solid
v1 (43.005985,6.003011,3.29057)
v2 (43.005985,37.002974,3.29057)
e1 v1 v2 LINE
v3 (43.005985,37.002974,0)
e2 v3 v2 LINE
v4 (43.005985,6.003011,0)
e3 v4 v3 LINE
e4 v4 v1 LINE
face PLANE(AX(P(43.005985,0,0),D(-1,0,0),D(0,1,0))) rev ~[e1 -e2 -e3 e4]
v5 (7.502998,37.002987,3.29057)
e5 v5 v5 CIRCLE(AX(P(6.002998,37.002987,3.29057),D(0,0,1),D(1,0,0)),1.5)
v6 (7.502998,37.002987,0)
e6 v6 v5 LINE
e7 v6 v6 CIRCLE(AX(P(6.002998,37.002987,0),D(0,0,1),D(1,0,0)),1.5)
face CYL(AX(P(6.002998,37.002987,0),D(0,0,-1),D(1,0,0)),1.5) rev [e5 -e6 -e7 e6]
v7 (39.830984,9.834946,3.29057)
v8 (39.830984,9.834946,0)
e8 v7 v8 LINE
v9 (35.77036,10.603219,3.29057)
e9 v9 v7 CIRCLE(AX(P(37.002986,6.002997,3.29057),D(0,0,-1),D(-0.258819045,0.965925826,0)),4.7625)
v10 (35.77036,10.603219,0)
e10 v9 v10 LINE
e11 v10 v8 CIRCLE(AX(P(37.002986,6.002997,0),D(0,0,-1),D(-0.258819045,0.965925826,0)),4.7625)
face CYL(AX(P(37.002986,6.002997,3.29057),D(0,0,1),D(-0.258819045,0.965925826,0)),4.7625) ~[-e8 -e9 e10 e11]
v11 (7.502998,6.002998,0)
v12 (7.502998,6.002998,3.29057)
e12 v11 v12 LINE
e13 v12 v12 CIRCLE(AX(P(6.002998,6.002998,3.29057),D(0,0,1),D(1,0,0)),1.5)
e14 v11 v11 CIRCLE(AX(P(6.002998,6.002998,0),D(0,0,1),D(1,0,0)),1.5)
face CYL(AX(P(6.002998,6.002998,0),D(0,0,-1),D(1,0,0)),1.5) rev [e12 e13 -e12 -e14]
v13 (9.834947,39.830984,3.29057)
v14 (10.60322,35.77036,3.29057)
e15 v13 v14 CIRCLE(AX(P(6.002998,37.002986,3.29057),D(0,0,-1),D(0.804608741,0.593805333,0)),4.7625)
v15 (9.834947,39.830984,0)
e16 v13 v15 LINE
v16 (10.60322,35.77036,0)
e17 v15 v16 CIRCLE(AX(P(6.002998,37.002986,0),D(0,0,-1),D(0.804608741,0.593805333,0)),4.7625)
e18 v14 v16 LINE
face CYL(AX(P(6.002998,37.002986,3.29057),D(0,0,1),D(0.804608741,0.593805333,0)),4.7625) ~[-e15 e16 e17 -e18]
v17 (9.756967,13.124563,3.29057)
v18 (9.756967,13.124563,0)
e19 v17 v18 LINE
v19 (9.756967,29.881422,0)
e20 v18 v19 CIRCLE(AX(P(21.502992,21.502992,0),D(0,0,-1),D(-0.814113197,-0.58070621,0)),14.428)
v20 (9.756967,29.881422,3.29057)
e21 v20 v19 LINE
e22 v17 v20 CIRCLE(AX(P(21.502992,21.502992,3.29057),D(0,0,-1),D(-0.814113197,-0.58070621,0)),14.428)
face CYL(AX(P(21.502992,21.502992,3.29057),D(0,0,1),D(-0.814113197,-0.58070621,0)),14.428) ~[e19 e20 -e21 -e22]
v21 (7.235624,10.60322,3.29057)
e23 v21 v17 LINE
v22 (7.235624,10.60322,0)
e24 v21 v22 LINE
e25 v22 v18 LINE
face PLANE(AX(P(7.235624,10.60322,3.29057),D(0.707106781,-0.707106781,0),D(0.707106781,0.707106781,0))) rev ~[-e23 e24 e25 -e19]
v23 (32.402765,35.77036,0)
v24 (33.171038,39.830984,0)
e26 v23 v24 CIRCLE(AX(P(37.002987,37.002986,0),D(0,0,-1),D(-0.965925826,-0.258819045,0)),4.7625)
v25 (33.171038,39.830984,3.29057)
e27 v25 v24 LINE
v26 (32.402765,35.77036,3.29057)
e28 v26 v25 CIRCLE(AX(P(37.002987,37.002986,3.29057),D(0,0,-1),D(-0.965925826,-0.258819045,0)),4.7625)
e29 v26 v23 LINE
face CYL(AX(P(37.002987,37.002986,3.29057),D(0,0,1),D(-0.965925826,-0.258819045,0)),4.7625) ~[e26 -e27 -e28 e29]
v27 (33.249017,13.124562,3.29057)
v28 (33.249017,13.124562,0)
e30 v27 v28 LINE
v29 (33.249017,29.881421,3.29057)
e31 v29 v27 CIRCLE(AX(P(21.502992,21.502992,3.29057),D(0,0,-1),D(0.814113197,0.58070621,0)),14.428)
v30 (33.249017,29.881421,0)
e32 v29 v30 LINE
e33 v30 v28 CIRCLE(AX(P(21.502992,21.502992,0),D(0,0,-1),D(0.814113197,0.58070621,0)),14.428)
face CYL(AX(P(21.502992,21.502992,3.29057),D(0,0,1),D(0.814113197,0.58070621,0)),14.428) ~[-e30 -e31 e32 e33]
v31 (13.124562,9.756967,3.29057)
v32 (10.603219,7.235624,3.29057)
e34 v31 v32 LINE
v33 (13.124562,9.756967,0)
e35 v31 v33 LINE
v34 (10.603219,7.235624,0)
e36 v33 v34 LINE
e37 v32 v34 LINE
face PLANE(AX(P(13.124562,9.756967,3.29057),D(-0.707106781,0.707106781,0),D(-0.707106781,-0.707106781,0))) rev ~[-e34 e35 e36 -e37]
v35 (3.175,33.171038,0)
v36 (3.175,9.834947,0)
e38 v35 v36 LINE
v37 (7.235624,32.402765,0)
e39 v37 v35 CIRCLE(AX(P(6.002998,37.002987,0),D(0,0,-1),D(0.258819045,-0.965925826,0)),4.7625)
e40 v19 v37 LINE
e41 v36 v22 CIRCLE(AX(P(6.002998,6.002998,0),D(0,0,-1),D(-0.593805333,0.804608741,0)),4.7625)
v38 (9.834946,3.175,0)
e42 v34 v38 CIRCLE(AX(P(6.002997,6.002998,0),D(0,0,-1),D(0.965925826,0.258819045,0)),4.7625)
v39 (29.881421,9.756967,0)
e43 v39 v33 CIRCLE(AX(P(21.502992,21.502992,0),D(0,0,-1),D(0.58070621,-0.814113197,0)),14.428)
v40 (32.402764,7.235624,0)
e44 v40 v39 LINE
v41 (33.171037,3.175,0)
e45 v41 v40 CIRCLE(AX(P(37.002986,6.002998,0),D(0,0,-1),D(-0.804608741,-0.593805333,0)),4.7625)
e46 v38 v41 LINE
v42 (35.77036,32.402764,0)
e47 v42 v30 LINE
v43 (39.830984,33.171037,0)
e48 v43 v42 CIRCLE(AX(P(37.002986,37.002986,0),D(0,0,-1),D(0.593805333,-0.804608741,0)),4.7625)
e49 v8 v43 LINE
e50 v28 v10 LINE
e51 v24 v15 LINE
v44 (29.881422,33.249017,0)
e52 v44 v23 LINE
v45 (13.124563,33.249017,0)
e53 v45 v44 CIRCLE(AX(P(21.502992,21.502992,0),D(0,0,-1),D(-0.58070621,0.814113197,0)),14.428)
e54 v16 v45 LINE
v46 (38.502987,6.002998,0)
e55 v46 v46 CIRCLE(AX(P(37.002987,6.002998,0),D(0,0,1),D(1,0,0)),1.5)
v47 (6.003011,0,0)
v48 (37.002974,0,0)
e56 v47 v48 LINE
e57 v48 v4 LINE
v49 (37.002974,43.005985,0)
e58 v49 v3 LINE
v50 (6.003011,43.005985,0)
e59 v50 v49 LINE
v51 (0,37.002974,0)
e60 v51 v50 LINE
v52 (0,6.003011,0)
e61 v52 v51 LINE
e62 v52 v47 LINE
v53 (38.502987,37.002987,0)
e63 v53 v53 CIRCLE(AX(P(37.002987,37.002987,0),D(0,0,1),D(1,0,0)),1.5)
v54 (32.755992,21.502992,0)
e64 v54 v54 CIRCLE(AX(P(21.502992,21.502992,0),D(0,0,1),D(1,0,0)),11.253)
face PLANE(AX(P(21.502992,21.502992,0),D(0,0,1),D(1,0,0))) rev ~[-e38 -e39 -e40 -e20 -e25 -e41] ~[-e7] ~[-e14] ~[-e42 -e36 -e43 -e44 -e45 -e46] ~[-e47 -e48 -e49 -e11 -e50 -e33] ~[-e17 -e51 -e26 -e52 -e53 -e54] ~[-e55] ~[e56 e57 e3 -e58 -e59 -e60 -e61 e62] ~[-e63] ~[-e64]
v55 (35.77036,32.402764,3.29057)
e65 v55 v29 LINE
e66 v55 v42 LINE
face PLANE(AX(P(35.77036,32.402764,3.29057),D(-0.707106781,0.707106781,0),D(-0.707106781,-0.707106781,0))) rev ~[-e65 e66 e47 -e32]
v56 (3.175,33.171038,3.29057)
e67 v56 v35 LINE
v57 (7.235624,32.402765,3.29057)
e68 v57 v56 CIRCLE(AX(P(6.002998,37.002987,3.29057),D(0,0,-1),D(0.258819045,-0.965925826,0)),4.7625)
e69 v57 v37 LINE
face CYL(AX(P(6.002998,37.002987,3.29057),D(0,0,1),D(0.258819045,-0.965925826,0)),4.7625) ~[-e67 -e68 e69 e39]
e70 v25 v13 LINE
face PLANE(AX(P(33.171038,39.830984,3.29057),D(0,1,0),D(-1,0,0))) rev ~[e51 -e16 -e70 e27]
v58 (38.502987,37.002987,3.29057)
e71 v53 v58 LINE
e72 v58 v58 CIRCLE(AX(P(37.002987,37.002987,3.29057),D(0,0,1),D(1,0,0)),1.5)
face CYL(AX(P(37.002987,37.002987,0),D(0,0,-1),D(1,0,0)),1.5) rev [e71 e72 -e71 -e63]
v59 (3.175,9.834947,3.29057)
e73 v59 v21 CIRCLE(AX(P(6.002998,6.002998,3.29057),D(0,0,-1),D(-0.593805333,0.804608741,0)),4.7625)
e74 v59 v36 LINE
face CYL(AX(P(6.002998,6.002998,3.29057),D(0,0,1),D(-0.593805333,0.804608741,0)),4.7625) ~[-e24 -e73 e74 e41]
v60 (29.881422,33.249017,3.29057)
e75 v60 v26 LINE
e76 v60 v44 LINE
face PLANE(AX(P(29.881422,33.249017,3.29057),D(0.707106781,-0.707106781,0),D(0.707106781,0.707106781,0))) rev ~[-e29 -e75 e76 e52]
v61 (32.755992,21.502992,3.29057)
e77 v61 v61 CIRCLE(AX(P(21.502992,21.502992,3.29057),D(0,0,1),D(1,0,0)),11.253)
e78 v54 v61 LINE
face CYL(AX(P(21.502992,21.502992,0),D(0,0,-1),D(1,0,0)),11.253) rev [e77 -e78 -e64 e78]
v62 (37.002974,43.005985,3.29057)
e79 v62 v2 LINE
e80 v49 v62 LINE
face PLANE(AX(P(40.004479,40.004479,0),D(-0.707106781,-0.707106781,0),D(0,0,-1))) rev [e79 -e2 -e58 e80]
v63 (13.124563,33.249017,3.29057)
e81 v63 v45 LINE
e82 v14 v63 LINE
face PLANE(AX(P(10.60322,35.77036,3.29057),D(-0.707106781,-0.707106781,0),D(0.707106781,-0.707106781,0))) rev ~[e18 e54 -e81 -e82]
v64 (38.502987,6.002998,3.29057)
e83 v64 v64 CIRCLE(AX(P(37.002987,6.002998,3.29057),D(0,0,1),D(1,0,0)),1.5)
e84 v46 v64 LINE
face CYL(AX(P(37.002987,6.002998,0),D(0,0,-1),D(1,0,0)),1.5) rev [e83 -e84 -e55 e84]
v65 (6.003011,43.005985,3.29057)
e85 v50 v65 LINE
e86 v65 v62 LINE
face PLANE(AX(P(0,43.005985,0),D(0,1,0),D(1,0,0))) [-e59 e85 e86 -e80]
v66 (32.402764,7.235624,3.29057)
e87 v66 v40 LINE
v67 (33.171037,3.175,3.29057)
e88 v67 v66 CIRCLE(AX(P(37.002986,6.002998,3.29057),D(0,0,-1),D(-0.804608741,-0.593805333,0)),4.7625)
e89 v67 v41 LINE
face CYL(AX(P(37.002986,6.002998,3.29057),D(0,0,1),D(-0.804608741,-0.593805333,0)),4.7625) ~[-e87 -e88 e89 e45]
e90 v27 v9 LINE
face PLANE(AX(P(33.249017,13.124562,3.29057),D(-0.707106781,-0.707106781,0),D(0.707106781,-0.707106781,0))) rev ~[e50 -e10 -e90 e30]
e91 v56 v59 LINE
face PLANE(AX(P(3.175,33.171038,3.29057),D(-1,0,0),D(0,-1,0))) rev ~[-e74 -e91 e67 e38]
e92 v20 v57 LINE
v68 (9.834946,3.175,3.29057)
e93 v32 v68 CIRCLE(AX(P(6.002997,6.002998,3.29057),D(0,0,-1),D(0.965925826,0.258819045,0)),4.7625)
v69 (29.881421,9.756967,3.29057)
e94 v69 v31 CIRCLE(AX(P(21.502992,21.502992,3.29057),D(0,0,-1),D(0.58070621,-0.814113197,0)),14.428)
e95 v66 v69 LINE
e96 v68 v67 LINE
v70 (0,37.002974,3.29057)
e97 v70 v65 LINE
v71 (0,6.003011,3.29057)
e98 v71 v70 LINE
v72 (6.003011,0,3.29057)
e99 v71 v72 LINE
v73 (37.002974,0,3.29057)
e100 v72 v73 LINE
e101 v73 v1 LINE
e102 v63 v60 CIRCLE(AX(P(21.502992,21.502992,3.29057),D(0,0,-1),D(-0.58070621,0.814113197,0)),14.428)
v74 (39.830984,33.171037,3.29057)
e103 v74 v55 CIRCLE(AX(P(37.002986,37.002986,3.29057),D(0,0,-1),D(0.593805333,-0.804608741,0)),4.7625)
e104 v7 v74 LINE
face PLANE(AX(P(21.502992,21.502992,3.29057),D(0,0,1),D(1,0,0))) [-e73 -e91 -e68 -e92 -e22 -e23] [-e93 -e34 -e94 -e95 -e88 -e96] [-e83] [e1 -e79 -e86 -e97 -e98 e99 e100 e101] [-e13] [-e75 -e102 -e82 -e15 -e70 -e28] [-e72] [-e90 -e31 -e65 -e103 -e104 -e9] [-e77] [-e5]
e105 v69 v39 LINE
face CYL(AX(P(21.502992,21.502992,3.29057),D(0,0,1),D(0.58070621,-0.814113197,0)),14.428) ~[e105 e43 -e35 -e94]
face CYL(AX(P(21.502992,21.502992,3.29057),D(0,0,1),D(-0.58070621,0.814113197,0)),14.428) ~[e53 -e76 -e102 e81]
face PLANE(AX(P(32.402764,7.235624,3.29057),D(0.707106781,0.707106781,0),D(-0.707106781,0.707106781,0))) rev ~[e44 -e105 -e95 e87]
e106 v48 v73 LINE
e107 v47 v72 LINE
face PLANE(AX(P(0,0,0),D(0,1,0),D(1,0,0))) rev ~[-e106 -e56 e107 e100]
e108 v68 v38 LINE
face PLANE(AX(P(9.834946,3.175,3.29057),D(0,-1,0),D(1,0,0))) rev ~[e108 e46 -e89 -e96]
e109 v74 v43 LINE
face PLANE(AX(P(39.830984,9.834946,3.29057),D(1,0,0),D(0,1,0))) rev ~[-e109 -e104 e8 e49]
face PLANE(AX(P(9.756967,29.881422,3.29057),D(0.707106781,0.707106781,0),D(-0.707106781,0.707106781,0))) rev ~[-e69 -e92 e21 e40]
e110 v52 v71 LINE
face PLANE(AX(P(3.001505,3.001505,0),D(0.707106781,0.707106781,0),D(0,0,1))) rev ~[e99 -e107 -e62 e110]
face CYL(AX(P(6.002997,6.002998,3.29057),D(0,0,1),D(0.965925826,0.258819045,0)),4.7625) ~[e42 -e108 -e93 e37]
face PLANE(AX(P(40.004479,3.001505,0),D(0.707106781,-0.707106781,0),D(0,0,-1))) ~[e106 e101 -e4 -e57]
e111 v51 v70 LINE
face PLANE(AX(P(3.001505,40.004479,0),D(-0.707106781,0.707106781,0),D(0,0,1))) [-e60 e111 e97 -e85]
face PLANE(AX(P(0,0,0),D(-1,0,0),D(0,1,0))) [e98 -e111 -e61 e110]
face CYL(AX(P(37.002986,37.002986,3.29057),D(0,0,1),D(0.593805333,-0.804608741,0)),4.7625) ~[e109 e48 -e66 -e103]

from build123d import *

# Parameters (mm, degrees)
F0_W            = 43.0059846
F0_H            = 43.0059846
F0_R            = 1.5
F0_R_2          = 11.2530001
F1_DEPTH        = 3.29057
F2_SIZE         = 6.0030106
F4_DEPTH        = 3.29057
F4_COPIES_COUNT = 4


# Not quite as in the source:
# - a pattern or mirror of a feature is missing from the dataset's text; its kind, count and spacing are read off the source's solid


with BuildPart() as f1:
    # F0 (on Top) → F1 (new body)
    with BuildSketch(Plane.XY):
        with Locations((21.5029923, 21.5029923)):
            Rectangle(F0_W, F0_H)
        with Locations((6.0029979, 6.0029979)):
            Circle(F0_R, mode=Mode.SUBTRACT)
        with Locations((21.5029923, 21.5029923)):
            Circle(F0_R_2, mode=Mode.SUBTRACT)
        with Locations((37.0029867, 6.0029979)):
            Circle(F0_R, mode=Mode.SUBTRACT)
        with Locations((6.0029979, 37.0029867)):
            Circle(F0_R, mode=Mode.SUBTRACT)
        with Locations((37.0029867, 37.0029867)):
            Circle(F0_R, mode=Mode.SUBTRACT)
    extrude(amount=F1_DEPTH)

    # F2
    f2_edges = [f1.edges().sort_by_distance(p)[0] for p in [
        (0, 0, 1.645285),
        (0, 43.005985, 1.645285),
        (43.005985, 0, 1.645285),
        (43.005985, 43.005985, 1.645285),
    ]]
    chamfer(f2_edges, length=F2_SIZE)

    # F3 (on face) → F4 (cut, through all)
    with BuildSketch(Plane.XY.offset(3.29057)):
        with BuildLine():
            ThreePointArc((7.2356236023, 32.4027649523), (5.1176370603, 32.3235056996), (3.175, 33.171037571))
            Line((3.175, 33.171037571), (3.175, 9.834947029))
            ThreePointArc((3.175, 9.834947029), (5.1176370603, 10.6824789004), (7.2356236023, 10.6032196477))
            Line((7.2356236023, 10.6032196477), (9.7569670059, 13.1245630513))
            ThreePointArc((9.7569670059, 13.1245630513), (7.0749922, 21.5029923), (9.7569670059, 29.8814215487))
            Line((9.7569670059, 29.8814215487), (7.2356236023, 32.4027649523))
        make_face()
    f4 = extrude(amount=-F4_DEPTH, mode=Mode.SUBTRACT)

    # F4_copies: F4 ×4 about axis
    f4_copies_axis = Axis((21.502992, 21.502992, 0), (0, 0, 1))
    for i in range(1, F4_COPIES_COUNT):
        add(f4.rotate(f4_copies_axis, i * 360 / F4_COPIES_COUNT), mode=Mode.SUBTRACT)


solid = f1.part
